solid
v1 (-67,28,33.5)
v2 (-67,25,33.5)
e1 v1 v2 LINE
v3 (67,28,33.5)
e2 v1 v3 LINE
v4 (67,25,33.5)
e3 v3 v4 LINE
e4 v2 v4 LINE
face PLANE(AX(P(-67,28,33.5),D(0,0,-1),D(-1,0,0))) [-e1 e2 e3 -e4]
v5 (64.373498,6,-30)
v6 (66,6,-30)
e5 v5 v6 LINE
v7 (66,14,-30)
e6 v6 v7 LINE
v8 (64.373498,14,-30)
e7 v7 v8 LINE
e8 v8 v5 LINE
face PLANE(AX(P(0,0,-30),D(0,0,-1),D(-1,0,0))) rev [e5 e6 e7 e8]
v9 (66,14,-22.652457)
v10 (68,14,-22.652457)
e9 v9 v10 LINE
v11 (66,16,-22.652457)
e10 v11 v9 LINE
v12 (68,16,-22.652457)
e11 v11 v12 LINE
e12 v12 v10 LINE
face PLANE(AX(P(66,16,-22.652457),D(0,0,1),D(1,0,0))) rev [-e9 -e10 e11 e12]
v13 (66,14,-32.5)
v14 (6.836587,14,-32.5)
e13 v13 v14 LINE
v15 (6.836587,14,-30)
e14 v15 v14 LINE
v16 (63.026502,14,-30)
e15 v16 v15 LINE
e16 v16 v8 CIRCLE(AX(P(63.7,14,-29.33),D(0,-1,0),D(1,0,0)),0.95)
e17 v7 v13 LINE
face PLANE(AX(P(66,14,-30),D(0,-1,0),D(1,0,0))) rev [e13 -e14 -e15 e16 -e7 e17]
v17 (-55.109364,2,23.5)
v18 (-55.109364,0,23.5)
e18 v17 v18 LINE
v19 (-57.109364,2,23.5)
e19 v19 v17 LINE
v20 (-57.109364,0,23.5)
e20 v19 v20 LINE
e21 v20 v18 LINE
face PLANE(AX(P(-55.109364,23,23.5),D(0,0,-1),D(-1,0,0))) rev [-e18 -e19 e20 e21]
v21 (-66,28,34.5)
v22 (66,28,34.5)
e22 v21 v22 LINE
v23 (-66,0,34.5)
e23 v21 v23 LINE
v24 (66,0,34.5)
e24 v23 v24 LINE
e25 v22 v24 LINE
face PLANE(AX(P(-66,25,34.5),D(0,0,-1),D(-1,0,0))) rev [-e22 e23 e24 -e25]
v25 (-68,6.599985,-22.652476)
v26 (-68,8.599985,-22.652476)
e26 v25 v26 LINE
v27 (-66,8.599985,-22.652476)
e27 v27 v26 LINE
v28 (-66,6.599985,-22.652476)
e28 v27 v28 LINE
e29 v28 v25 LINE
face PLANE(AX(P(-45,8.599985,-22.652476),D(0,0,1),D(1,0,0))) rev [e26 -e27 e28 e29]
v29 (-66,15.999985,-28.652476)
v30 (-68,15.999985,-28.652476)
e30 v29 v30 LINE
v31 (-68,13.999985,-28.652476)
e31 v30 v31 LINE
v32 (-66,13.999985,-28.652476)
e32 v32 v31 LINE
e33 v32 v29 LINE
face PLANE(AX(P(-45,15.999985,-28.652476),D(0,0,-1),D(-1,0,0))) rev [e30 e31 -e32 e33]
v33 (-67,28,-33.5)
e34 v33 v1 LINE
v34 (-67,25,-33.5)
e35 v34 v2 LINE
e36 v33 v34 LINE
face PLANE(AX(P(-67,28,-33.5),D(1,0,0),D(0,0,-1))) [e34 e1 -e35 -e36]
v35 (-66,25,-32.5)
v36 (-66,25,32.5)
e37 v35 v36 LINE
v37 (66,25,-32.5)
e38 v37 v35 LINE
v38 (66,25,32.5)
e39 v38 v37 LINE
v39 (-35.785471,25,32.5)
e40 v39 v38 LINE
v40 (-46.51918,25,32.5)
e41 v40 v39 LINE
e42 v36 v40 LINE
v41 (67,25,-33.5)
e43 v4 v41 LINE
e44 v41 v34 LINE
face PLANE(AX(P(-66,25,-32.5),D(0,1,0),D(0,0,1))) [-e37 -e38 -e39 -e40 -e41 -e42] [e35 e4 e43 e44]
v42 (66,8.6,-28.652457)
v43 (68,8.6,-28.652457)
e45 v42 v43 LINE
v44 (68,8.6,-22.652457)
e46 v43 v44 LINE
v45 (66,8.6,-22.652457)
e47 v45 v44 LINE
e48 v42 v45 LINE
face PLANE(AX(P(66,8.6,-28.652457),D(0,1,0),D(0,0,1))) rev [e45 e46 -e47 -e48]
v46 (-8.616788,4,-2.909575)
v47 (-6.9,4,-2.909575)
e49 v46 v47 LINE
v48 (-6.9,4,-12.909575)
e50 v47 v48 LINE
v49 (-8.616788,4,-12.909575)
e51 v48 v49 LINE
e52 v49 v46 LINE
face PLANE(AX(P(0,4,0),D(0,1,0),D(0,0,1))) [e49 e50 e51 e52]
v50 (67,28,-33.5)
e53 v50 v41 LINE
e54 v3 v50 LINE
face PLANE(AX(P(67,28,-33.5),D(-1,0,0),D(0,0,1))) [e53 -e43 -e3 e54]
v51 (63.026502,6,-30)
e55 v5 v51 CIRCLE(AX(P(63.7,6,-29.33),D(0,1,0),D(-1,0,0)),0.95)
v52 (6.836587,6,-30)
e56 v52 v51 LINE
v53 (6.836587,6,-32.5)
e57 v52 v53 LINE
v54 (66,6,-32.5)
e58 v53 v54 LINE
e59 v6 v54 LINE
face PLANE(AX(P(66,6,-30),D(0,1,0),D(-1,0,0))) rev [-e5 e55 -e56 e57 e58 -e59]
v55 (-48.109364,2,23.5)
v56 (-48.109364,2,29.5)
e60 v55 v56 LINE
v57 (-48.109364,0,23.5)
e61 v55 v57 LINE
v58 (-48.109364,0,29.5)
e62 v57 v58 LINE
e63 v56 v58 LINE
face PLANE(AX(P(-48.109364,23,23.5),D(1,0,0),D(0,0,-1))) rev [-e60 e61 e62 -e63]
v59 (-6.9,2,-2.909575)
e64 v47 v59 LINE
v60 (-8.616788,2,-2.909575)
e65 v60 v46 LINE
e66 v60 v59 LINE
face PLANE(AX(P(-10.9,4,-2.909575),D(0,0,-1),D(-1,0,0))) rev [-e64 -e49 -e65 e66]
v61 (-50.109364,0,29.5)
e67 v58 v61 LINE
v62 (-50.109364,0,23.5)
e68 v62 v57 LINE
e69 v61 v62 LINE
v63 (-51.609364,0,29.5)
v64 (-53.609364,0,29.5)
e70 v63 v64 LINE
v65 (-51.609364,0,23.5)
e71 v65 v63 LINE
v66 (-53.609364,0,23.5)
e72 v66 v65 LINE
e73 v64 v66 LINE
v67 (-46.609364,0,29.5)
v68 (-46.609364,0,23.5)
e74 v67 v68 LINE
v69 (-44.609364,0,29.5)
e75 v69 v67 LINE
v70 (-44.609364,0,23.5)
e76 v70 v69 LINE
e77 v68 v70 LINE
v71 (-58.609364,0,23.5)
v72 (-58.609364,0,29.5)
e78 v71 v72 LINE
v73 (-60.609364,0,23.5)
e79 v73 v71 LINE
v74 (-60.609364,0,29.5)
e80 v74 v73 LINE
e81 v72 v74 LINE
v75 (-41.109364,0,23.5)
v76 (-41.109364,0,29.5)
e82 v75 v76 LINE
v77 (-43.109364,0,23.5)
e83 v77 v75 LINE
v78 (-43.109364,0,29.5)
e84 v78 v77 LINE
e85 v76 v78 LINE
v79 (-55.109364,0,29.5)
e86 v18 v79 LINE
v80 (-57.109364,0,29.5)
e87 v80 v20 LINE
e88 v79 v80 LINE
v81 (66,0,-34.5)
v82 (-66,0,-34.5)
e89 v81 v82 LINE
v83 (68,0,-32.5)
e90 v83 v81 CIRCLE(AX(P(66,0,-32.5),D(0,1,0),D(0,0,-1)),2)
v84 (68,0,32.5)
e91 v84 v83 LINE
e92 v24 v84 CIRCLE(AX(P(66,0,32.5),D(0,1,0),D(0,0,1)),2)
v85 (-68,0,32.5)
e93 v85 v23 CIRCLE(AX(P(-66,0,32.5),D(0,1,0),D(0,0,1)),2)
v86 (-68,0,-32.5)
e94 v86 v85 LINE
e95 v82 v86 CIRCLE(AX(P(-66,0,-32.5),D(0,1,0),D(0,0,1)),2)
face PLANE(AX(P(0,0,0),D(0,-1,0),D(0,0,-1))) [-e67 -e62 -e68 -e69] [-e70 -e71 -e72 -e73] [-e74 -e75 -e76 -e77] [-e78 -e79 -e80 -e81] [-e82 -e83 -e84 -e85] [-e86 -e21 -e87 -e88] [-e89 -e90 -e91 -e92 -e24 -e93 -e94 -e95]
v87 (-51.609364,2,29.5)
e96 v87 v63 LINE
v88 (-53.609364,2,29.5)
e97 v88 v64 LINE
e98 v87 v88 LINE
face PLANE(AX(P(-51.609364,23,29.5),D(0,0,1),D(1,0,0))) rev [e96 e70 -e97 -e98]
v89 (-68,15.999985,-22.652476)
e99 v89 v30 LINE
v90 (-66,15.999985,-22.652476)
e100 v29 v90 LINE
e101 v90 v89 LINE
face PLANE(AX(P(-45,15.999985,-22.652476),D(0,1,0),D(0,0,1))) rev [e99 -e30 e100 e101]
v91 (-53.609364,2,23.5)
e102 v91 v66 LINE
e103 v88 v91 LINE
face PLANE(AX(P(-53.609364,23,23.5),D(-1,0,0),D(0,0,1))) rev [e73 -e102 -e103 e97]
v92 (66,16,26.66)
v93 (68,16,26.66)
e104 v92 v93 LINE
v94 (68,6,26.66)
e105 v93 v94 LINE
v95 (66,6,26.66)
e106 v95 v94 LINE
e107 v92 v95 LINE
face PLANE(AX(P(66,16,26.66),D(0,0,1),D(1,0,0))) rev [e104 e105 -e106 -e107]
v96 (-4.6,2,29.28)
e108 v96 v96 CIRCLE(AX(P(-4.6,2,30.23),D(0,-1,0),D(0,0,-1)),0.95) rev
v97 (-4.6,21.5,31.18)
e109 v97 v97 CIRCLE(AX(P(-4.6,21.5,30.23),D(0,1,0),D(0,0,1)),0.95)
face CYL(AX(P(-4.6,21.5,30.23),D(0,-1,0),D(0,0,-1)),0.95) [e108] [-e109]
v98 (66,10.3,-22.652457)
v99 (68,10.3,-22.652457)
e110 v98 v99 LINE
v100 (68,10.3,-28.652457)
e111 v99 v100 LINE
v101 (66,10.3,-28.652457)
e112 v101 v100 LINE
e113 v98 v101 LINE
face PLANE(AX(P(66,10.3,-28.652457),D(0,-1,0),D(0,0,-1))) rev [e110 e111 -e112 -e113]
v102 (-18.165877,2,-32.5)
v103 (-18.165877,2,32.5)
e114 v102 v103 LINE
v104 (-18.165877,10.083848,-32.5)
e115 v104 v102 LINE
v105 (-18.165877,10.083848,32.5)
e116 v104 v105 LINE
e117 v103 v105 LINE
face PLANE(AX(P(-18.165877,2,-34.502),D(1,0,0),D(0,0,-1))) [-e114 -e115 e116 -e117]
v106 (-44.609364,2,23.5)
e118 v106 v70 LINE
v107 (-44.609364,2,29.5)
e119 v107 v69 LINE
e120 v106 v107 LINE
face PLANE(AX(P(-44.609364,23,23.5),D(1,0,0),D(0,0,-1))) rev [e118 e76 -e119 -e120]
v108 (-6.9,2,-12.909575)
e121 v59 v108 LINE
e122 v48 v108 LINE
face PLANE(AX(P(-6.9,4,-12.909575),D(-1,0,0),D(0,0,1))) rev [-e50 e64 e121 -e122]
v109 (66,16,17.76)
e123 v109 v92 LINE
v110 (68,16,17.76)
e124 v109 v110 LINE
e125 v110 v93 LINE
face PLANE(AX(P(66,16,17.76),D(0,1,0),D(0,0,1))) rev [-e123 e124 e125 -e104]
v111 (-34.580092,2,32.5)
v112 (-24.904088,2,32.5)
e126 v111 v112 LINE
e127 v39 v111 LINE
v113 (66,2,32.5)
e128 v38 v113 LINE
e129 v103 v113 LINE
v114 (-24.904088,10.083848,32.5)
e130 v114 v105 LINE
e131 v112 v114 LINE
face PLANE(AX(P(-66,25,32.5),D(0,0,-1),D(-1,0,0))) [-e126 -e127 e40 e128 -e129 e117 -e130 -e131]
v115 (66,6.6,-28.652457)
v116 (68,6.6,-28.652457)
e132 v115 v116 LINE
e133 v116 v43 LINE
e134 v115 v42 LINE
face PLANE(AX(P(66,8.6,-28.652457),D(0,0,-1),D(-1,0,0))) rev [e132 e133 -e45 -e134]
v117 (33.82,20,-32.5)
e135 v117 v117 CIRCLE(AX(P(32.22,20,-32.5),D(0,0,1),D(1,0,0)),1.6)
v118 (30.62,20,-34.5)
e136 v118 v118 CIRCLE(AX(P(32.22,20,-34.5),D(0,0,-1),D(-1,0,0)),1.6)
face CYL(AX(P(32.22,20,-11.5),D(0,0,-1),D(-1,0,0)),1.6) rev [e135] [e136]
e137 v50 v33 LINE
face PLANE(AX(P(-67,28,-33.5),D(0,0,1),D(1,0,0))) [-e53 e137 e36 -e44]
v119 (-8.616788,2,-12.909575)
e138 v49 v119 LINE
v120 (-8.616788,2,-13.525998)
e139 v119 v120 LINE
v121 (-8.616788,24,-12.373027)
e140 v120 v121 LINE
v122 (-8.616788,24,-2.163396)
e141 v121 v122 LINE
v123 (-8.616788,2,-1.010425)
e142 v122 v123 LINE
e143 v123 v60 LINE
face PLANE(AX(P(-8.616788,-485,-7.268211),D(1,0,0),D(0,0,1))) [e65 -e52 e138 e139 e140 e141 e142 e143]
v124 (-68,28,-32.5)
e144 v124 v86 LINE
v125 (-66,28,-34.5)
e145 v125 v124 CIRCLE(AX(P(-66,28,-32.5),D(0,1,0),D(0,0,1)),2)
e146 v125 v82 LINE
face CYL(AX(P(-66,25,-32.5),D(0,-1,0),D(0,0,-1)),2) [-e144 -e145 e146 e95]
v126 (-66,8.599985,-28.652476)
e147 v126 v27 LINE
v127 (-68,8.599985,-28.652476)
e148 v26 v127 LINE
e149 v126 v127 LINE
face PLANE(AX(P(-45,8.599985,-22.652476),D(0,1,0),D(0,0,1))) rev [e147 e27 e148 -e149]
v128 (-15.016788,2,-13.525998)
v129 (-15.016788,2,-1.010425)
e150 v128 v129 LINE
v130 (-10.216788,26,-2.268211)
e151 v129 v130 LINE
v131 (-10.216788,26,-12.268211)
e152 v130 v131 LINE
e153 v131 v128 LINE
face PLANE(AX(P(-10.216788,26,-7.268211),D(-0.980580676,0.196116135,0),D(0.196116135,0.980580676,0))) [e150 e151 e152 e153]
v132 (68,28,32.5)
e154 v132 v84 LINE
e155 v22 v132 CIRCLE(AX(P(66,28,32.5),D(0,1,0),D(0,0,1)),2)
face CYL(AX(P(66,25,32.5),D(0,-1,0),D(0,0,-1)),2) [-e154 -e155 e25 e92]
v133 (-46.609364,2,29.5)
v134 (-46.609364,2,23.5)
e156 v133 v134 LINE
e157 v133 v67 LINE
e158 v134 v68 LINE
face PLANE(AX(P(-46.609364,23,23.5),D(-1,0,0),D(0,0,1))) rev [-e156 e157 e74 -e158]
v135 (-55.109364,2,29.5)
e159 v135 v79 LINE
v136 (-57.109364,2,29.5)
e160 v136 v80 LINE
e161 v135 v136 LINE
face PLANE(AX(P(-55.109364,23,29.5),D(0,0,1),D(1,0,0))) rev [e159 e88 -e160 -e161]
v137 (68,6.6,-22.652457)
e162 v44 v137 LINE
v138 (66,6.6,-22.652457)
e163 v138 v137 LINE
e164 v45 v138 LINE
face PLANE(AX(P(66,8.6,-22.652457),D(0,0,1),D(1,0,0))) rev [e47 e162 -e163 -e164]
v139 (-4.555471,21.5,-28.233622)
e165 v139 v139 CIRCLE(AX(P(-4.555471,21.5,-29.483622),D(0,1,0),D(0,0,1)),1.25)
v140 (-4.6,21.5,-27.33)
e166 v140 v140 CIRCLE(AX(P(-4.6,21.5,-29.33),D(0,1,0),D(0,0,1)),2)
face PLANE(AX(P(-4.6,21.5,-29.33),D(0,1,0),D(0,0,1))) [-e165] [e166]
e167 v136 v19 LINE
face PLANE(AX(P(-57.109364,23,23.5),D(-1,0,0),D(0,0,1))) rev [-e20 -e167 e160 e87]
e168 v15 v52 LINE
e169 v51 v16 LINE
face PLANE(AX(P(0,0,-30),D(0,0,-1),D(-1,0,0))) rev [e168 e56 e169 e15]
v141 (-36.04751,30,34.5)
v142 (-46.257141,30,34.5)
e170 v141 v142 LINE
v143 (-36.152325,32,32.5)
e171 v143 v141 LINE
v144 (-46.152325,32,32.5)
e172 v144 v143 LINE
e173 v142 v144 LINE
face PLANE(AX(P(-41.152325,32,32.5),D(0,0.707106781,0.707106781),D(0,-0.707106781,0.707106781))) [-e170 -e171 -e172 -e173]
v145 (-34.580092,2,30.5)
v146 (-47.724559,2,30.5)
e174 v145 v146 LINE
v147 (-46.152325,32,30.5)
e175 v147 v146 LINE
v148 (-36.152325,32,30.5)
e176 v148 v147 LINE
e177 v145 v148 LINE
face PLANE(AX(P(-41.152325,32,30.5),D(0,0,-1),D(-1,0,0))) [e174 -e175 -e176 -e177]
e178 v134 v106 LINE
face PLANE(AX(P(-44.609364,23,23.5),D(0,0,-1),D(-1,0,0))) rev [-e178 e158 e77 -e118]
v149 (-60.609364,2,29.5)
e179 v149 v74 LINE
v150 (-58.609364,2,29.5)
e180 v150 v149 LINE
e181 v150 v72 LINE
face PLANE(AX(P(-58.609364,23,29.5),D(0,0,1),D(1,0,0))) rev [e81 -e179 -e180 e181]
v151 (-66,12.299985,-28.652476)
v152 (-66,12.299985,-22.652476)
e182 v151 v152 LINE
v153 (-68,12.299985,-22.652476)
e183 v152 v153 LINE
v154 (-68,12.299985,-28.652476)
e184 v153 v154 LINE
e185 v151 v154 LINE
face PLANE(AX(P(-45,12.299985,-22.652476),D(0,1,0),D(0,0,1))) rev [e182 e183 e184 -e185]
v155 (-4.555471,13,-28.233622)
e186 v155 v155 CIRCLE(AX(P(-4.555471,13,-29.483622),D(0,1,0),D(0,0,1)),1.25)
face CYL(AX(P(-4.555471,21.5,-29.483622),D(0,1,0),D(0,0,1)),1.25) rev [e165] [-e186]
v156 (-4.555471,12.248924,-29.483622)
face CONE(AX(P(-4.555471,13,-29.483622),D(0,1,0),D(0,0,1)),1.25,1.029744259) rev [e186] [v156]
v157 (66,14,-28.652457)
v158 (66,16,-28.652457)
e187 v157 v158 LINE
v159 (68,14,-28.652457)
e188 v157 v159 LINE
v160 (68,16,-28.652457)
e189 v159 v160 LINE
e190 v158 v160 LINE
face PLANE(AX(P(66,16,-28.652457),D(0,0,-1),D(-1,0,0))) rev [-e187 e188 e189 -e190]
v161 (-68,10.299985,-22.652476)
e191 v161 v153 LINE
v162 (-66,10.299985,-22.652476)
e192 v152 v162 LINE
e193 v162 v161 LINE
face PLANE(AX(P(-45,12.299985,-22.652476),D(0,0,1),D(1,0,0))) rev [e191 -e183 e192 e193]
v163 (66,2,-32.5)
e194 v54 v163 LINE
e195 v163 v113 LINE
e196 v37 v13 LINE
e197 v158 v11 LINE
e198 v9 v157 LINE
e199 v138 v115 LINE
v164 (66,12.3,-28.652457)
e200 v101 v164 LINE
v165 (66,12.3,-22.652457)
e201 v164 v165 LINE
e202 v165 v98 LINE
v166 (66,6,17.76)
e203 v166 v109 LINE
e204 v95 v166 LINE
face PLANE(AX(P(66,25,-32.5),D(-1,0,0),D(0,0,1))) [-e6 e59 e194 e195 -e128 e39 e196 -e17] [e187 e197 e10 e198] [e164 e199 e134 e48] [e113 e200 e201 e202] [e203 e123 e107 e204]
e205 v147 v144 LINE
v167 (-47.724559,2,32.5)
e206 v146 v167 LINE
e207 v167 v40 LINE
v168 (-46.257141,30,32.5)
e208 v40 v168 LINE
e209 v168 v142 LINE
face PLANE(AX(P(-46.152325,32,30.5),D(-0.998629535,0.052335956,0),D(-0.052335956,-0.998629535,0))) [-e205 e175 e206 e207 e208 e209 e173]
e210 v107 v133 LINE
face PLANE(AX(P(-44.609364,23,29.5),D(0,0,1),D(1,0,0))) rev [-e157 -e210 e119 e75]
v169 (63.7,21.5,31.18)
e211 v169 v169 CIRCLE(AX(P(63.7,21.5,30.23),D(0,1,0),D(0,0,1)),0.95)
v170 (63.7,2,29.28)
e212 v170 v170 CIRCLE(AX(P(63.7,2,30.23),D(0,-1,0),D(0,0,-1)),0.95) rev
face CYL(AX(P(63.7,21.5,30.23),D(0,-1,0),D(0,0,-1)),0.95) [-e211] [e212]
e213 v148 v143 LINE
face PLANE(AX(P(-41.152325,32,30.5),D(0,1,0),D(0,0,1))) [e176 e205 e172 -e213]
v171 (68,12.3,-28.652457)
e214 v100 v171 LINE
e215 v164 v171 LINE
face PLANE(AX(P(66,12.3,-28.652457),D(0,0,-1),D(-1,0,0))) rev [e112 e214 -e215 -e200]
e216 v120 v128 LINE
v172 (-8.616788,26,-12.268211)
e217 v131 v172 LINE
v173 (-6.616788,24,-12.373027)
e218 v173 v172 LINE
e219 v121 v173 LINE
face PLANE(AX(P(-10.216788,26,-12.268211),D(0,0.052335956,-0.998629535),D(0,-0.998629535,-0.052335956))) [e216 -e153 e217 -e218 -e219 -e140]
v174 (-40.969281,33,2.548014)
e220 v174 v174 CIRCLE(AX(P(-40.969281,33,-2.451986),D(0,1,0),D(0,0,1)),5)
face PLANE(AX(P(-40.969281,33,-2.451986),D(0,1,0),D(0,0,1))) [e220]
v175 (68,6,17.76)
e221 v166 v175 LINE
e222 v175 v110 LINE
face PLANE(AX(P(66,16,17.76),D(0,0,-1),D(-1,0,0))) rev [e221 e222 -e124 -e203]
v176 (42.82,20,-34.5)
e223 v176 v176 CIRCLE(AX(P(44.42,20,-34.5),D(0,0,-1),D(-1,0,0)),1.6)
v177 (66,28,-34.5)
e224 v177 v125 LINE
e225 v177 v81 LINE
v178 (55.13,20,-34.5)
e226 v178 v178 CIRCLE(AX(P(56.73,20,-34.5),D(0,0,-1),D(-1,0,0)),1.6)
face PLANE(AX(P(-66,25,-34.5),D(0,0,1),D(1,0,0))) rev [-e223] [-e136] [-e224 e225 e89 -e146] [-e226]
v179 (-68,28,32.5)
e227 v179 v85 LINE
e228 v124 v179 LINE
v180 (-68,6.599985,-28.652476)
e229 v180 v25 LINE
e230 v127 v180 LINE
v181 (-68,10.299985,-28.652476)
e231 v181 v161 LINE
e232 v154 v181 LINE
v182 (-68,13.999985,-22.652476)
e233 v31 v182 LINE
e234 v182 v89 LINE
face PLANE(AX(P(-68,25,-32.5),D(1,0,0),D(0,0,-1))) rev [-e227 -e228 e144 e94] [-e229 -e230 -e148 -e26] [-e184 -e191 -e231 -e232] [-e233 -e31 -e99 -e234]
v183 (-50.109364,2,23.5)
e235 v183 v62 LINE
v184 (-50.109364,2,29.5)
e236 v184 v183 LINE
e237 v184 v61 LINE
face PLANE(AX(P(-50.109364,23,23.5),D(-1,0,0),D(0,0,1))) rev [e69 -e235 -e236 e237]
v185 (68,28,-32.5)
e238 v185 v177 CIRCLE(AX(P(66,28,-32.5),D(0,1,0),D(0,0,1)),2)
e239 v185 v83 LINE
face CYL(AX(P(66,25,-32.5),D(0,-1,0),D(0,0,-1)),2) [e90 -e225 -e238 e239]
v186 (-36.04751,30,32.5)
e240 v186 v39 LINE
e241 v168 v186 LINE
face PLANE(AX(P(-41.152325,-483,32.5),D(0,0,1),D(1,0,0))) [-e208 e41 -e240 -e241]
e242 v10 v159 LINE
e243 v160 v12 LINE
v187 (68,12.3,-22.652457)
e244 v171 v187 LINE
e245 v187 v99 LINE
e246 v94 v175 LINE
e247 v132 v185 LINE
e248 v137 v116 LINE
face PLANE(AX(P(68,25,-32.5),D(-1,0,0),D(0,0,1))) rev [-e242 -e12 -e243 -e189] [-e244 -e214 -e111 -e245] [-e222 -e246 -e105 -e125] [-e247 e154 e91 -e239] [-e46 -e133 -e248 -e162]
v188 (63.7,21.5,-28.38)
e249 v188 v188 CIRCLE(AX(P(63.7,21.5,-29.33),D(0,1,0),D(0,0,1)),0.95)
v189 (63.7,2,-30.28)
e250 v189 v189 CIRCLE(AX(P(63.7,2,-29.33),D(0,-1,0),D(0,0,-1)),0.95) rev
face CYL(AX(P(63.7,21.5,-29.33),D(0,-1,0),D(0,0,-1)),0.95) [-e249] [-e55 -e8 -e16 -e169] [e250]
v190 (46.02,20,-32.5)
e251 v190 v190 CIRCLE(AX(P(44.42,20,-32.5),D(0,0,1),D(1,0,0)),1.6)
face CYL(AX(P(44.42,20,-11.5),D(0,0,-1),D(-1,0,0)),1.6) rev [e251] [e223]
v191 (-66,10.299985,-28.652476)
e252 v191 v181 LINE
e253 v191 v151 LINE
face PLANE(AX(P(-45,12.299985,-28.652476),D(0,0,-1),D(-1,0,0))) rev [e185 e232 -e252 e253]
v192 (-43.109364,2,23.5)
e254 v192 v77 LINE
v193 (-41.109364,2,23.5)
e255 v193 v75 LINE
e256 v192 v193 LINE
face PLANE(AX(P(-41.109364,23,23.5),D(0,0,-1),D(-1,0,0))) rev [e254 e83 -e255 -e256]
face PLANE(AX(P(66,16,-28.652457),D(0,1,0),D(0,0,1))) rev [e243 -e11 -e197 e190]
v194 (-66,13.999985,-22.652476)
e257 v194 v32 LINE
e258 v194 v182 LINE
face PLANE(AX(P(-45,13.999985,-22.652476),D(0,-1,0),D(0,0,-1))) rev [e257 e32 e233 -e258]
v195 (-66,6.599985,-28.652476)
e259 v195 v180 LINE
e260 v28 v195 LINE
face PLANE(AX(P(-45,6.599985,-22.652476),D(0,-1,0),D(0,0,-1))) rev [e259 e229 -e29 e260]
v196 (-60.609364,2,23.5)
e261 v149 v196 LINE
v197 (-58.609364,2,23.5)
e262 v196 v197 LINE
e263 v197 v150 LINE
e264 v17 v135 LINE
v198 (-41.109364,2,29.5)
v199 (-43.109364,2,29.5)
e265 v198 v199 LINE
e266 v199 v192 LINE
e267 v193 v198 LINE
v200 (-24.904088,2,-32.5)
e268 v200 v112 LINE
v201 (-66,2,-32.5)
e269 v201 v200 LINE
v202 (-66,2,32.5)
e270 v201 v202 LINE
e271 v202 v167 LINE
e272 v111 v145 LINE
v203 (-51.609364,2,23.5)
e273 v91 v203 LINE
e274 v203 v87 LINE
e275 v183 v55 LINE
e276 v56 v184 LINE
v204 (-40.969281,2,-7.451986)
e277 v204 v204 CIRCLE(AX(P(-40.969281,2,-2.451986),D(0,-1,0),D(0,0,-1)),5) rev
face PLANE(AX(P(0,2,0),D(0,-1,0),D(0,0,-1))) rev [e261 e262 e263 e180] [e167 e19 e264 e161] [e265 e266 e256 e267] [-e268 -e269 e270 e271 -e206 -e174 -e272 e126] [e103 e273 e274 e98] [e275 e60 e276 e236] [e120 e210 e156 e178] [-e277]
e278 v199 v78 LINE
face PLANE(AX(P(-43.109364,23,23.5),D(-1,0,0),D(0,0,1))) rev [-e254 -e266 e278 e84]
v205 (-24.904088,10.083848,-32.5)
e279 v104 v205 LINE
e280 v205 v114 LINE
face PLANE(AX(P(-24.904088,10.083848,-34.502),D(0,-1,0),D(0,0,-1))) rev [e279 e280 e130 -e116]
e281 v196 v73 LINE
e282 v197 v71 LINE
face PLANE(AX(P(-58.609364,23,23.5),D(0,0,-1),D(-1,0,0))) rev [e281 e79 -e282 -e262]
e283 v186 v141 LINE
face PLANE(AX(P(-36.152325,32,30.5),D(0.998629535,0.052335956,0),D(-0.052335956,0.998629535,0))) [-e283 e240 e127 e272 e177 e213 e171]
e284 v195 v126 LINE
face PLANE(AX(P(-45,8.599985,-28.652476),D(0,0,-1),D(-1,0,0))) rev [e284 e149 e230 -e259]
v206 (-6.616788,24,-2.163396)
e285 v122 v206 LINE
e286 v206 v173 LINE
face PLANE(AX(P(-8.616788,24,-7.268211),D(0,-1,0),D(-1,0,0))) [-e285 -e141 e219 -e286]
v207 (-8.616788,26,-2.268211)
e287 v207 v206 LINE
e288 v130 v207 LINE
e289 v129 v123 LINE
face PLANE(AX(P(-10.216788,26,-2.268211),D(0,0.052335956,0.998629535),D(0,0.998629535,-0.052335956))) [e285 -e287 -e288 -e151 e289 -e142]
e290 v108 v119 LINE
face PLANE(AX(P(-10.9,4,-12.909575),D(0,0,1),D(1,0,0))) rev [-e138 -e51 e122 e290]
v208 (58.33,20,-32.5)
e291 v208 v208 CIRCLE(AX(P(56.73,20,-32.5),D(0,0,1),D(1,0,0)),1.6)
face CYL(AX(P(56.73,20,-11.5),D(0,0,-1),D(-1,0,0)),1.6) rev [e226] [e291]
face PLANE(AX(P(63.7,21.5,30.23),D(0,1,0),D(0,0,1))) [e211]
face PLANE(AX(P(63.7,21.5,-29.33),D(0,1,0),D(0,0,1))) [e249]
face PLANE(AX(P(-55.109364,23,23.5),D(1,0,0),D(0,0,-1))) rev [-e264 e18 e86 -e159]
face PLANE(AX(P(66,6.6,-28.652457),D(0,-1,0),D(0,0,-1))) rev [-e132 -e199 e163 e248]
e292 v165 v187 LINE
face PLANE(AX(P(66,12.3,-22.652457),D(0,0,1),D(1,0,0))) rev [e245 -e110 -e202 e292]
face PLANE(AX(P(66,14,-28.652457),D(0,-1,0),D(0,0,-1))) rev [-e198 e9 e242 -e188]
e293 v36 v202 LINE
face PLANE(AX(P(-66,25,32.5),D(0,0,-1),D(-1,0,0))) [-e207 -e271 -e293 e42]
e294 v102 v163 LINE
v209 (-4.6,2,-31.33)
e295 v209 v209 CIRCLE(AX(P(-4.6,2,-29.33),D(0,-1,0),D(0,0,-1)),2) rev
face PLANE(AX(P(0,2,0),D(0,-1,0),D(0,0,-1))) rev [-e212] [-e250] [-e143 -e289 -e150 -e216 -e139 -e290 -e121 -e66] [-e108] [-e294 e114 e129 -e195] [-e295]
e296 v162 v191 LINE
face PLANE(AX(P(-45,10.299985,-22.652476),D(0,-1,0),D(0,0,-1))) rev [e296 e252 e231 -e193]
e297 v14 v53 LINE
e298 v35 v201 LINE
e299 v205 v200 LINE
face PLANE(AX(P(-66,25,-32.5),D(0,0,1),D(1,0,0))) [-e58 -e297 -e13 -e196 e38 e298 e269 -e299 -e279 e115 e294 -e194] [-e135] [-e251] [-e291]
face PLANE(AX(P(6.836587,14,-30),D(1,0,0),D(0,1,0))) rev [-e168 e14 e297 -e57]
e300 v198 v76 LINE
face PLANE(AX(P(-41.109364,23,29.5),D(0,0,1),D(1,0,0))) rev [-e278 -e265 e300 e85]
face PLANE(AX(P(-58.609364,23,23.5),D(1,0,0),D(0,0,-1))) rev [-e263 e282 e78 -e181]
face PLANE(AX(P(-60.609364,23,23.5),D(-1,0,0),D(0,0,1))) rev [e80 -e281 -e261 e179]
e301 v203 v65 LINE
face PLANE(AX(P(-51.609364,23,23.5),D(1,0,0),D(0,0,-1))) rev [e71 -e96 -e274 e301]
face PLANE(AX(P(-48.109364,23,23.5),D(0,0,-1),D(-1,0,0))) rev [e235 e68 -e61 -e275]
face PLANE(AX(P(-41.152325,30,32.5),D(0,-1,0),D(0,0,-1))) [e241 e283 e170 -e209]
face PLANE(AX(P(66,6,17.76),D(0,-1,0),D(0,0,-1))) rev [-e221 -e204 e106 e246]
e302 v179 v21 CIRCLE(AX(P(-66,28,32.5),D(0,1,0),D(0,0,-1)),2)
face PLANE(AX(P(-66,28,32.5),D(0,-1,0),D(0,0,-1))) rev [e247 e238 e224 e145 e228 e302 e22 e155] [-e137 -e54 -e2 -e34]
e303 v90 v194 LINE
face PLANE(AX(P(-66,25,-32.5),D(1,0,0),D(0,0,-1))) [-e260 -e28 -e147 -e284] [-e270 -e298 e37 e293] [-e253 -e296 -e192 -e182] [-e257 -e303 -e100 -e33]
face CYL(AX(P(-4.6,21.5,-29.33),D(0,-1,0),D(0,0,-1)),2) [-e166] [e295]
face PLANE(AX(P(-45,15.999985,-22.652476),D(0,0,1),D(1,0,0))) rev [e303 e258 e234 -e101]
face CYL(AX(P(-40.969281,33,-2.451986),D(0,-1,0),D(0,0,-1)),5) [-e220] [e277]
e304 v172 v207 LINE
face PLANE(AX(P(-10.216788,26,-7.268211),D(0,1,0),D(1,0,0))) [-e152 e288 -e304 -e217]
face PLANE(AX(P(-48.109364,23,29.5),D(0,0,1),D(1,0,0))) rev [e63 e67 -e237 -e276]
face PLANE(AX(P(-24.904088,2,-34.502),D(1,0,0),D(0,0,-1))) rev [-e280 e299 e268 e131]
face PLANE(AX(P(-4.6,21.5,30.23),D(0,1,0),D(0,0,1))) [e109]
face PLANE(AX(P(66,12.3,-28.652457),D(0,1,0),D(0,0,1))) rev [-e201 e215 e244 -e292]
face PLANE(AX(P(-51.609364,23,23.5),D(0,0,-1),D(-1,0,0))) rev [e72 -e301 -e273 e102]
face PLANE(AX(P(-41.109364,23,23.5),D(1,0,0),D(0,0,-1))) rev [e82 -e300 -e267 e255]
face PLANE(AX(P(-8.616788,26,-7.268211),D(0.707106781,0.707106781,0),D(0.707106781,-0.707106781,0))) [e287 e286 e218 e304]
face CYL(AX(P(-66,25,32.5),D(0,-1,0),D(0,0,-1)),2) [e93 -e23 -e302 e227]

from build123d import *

# Parameters (mm, degrees)
SKETCH_2_W                  = 132
SKETCH_2_H                  = 65
EXTRUDE_2_DEPTH             = 2
SKETCH_2_3_W                = 132
SKETCH_2_3_H                = 65
EXTRUDE_3_DEPTH             = 25
SKETCH_4_R                  = 0.95
SKETCH_4_R_2                = 2
EXTRUDE_4_DEPTH             = 19.5
SKETCH_9_W                  = 6
SKETCH_9_H                  = 2
CUT_EXTRUDE_1_DEPTH         = 23
SKETCH_5_W                  = 8.9
SKETCH_5_H                  = 10
SKETCH_5_W_2                = 6
SKETCH_5_H_2                = 2
CUT_EXTRUDE_2_DEPTH         = 2
SKETCH_11_W                 = 2
SKETCH_11_H                 = 6
CUT_EXTRUDE_3_DEPTH         = 23
SKETCH_12_R                 = 1.6
CUT_EXTRUDE_4_DEPTH         = 23
HOLE_WIZARD_M3_3_D          = 2.5
HOLE_WIZARD_M3_3_DEPTH      = 8.5
HOLE_WIZARD_M3_3_TIP        = 0.751075774
SKETCH_24_W                 = 134
SKETCH_24_H                 = 67
EXTRUDE_5_DEPTH             = 3
SKETCH_25_R                 = 5
EXTRUDE_6_DEPTH             = 31
MACRO_START                 = 30.5
MACRO_FEATURE_1_DEPTH       = 4
MACRO_FEATURE_1_2_DEPTH     = 2
MACRO_START_2               = 45.608387387
MACRO_FEATURE_1_3_OUTLINE_W = 13
MACRO_FEATURE_1_3_OUTLINE_H = 6
MACRO_FEATURE_1_3_DEPTH     = 2.391612613
SKETCH_28_W                 = 4
SKETCH_28_H                 = 10
EXTRUDE_7_DEPTH             = 2
MACRO_START_3               = -10.52248
MACRO_FEATURE_2_DEPTH       = 1.905691985
MACRO_START_4               = -10.216788015
MACRO_FEATURE_2_2_DEPTH     = 1.6
MACRO_START_5               = -13.52599806
MACRO_FEATURE_2_3_DEPTH     = 12.515573406
MACRO_START_6               = -12.373026916
MACRO_FEATURE_2_4_DEPTH     = 10.209631117
MACRO_START_7               = -16
MACRO_FEATURE_2_5_DEPTH     = 10
SKETCH_32_W                 = 59.163412992
SKETCH_32_H                 = 8
EXTRUDE_9_DEPTH             = 2.5
EXTRUDE_10_REACH            = 103.005
SKETCH_31_W                 = 6.738210925
SKETCH_31_H                 = 8.083848138


with BuildPart() as part:
    # 草图2 → 凸台-拉伸2 (new body)
    with BuildSketch(Plane(origin=(0, 0, 0), x_dir=(1, 0, 0), z_dir=(0, 1, 0))):
        Rectangle(SKETCH_2_W, SKETCH_2_H)
    extrude(amount=EXTRUDE_2_DEPTH)

    # 草图2<3> → 凸台-拉伸3 (add)
    with BuildSketch(Plane(origin=(0, 0, 0), x_dir=(1, 0, 0), z_dir=(0, 1, 0))):
        with BuildLine():
            Line((-66, 34.5), (66, 34.5))
            ThreePointArc((66, 34.5), (67.414213562, 33.914213562), (68, 32.5))
            Line((68, 32.5), (68, -32.5))
            ThreePointArc((68, -32.5), (67.414213562, -33.914213562), (66, -34.5))
            Line((66, -34.5), (-66, -34.5))
            ThreePointArc((-66, -34.5), (-67.414213562, -33.914213562), (-68, -32.5))
            Line((-68, -32.5), (-68, 32.5))
            ThreePointArc((-68, 32.5), (-67.414213562, 33.914213562), (-66, 34.5))
        make_face()
        Rectangle(SKETCH_2_3_W, SKETCH_2_3_H, mode=Mode.SUBTRACT)
    extrude(amount=EXTRUDE_3_DEPTH)

    # 草图4 → 凸台-拉伸4 (add)
    with BuildSketch(Plane(origin=(0, 2, 0), x_dir=(1, 0, 0), z_dir=(0, 1, 0))):
        with Locations(Location((63.7, 29.33, 0), (0, 0, 90))):
            Circle(SKETCH_4_R)
        with Locations(Location((63.7, -30.23, 0), (0, 0, 90))):
            Circle(SKETCH_4_R)
        with Locations(Location((-4.6, 29.33, 0), (0, 0, 90))):
            Circle(SKETCH_4_R_2)
        with Locations(Location((-4.6, -30.23, 0), (0, 0, 90))):
            Circle(SKETCH_4_R)
    extrude(amount=EXTRUDE_4_DEPTH)

    # 草图9 → 切除-拉伸1 (cut)
    with BuildSketch(Plane.ZY.offset(68)):
        with Locations((-25.652476361, 14.999984766)):
            Rectangle(SKETCH_9_W, SKETCH_9_H)
        with Locations((-25.652476361, 11.299984766)):
            Rectangle(SKETCH_9_W, SKETCH_9_H)
        with Locations((-25.652476361, 7.599984766)):
            Rectangle(SKETCH_9_W, SKETCH_9_H)
    extrude(amount=-CUT_EXTRUDE_1_DEPTH, mode=Mode.SUBTRACT)

    # 草图5 → 切除-拉伸2 (cut)
    with BuildSketch(Plane(origin=(68, 0, 0), x_dir=(0, 0, -1), z_dir=(1, 0, 0))):
        with Locations((-22.21, 11)):
            Rectangle(SKETCH_5_W, SKETCH_5_H)
        with Locations((25.652457488, 15)):
            Rectangle(SKETCH_5_W_2, SKETCH_5_H_2)
        with Locations((25.652457488, 11.3)):
            Rectangle(SKETCH_5_W_2, SKETCH_5_H_2)
        with Locations((25.652457488, 7.6)):
            Rectangle(SKETCH_5_W_2, SKETCH_5_H_2)
    extrude(amount=-CUT_EXTRUDE_2_DEPTH, mode=Mode.SUBTRACT)

    # 草图11 → 切除-拉伸3 (cut)
    with BuildSketch(Plane.XZ):
        with Locations((-42.109364057, 26.5)):
            Rectangle(SKETCH_11_W, SKETCH_11_H)
        with Locations((-45.609364057, 26.5)):
            Rectangle(SKETCH_11_W, SKETCH_11_H)
        with Locations((-49.109364057, 26.5)):
            Rectangle(SKETCH_11_W, SKETCH_11_H)
        with Locations((-52.609364057, 26.5)):
            Rectangle(SKETCH_11_W, SKETCH_11_H)
        with Locations((-56.109364057, 26.5)):
            Rectangle(SKETCH_11_W, SKETCH_11_H)
        with Locations((-59.609364057, 26.5)):
            Rectangle(SKETCH_11_W, SKETCH_11_H)
    extrude(amount=-CUT_EXTRUDE_3_DEPTH, mode=Mode.SUBTRACT)

    # 草图12 → 切除-拉伸4 (cut)
    with BuildSketch(Plane(origin=(0, 0, -34.5), x_dir=(-1, 0, 0), z_dir=(0, 0, -1))):
        with Locations((-56.73, 20)):
            Circle(SKETCH_12_R)
        with Locations((-44.42, 20)):
            Circle(SKETCH_12_R)
        with Locations((-32.22, 20)):
            Circle(SKETCH_12_R)
    extrude(amount=-CUT_EXTRUDE_4_DEPTH, mode=Mode.SUBTRACT)

    # M3 螺纹孔3
    with Locations(Plane(origin=(0, 21.5, 0), x_dir=(1, 0, 0), z_dir=(0, 1, 0))):
        with Locations((-4.555471055, 29.483622127)):
            Hole(HOLE_WIZARD_M3_3_D / 2, depth=HOLE_WIZARD_M3_3_DEPTH)
            with Locations((0, 0, -(HOLE_WIZARD_M3_3_DEPTH + HOLE_WIZARD_M3_3_TIP / 2))):  # 118° drill point
                Cone(0, HOLE_WIZARD_M3_3_D / 2, HOLE_WIZARD_M3_3_TIP, mode=Mode.SUBTRACT)

    # 草图24 → 凸台-拉伸5 (add)
    with BuildSketch(Plane(origin=(0, 25, 0), x_dir=(1, 0, 0), z_dir=(0, 1, 0))):
        with BuildLine():
            Line((66, -34.5), (-66, -34.5))
            ThreePointArc((-66, -34.5), (-67.414213562, -33.914213562), (-68, -32.5))
            Line((-68, -32.5), (-68, 32.5))
            ThreePointArc((-68, 32.5), (-67.414213562, 33.914213562), (-66, 34.5))
            Line((-66, 34.5), (66, 34.5))
            ThreePointArc((66, 34.5), (67.414213562, 33.914213562), (68, 32.5))
            Line((68, 32.5), (68, -32.5))
            ThreePointArc((68, -32.5), (67.414213562, -33.914213562), (66, -34.5))
        make_face()
        Rectangle(SKETCH_24_W, SKETCH_24_H, mode=Mode.SUBTRACT)
    extrude(amount=EXTRUDE_5_DEPTH)

    # 草图25 → 凸台-拉伸6 (add)
    with BuildSketch(Plane(origin=(0, 2, 0), x_dir=(1, 0, 0), z_dir=(0, 1, 0))):
        with Locations(Location((-40.969280892, 2.451986174, 0), (0, 0, 90))):
            Circle(SKETCH_25_R)
    extrude(amount=EXTRUDE_6_DEPTH)



with BuildPart() as body_2:
    # Macro Feature 1: read off the stored shape, not the designer's step
    # Macro Feature 1 outline → Macro Feature 1 (new body)
    with BuildSketch(Plane.XY.offset(MACRO_START)):
        Polygon((-36.152325447, 32), (-46.152325447, 32), (-46.257141006, 30), (-36.047509888, 30), align=None)
    extrude(amount=MACRO_FEATURE_1_DEPTH)


with BuildPart() as part_1:
    add(part.part)

    add(body_2.part)  # Macro Feature 1 2 merges body 2
    # Macro Feature 1 2 outline → Macro Feature 1 2 (add)
    with BuildSketch(Plane.XY.offset(MACRO_START)):
        Polygon((-36.047509888, 30), (-46.257141006, 30), (-47.724558825, 2), (-34.580092068, 2), align=None)
    extrude(amount=MACRO_FEATURE_1_2_DEPTH)

    # Macro Feature 1 3 outline → Macro Feature 1 3 (cut)
    with BuildSketch(Plane(origin=(0, 0, 0), x_dir=(1, 0, 0), z_dir=(0, 0.707106781186547, 0.707106781186548)).offset(MACRO_START_2)):
        with Locations((-41.5, -2)):
            Rectangle(MACRO_FEATURE_1_3_OUTLINE_W, MACRO_FEATURE_1_3_OUTLINE_H)
    extrude(amount=MACRO_FEATURE_1_3_DEPTH, mode=Mode.SUBTRACT)

    # 草图28 → 凸台-拉伸7 (add)
    with BuildSketch(Plane(origin=(0, 2, 0), x_dir=(1, 0, 0), z_dir=(0, 1, 0))):
        with Locations((-8.9, 7.909574936)):
            Rectangle(SKETCH_28_W, SKETCH_28_H)
    extrude(amount=EXTRUDE_7_DEPTH)

    # Macro Feature 2: read off the stored shape, not the designer's step
    # Macro Feature 2 outline → Macro Feature 2 (add)
    with BuildSketch(Plane.YZ.offset(MACRO_START_3)):
        Polygon((2, -12.909574936), (2, -13.52599806), (24, -12.373026916), (24, -2.163395799), (2, -1.010424654), (2, -2.909574936), (4, -2.909574936), (4, -12.909574936), align=None)
    extrude(amount=MACRO_FEATURE_2_DEPTH)

    # Macro Feature 2 2 outline → Macro Feature 2 2 (add)
    with BuildSketch(Plane.YZ.offset(MACRO_START_4)):
        Polygon((24, -2.163395799), (24, -12.373026916), (26, -12.268211357), (26, -2.268211357), align=None)
    extrude(amount=MACRO_FEATURE_2_2_DEPTH)

    # Macro Feature 2 3 outline → Macro Feature 2 3 (add)
    with BuildSketch(Plane.XY.offset(MACRO_START_5)):
        Polygon((-10.216788015, 24), (-10.216788015, 26), (-15.016788015, 2), (-10.52248, 2), (-10.52248, 24), align=None)
    extrude(amount=MACRO_FEATURE_2_3_DEPTH)

    # Macro Feature 2 4 outline → Macro Feature 2 4 (add)
    with BuildSketch(Plane.XY.offset(MACRO_START_6)):
        Polygon((-8.616788015, 26), (-8.616788015, 24), (-6.616788015, 24), align=None)
    extrude(amount=MACRO_FEATURE_2_4_DEPTH)

    # Macro Feature 2 5 outline → Macro Feature 2 5 (cut)
    with BuildSketch(Plane.YZ.offset(MACRO_START_7)):
        Polygon((2, -13.52599806), (27, -13.52599806), (27, -12.215803578), (26, -12.268211357), align=None)
        Polygon((26, -2.268211357), (27, -2.320619136), (27, -1.010424654), (2, -1.010424654), align=None)
    extrude(amount=MACRO_FEATURE_2_5_DEPTH, mode=Mode.SUBTRACT)

    # 草图32 → 凸台-拉伸9 (add)
    with BuildSketch(Plane.XY.offset(-32.5)):
        with Locations((36.418293504, 10)):
            Rectangle(SKETCH_32_W, SKETCH_32_H)
    extrude(amount=EXTRUDE_9_DEPTH)

    # 草图31 → 凸台-拉伸10 (add, up to next)
    with BuildSketch(Plane(origin=(0, 0, 32.5), x_dir=(-1, 0, 0), z_dir=(0, 0, -1)), mode=Mode.PRIVATE) as extrude_10_sk1:
        with Locations((21.534982766, 6.041924069)):
            Rectangle(SKETCH_31_W, SKETCH_31_H)
    extrude_10_tool1 = extrude(extrude_10_sk1.sketch, amount=EXTRUDE_10_REACH, mode=Mode.PRIVATE) - part_1.part
    add(extrude_10_tool1.solids().sort_by_distance((-21.534983, 6.041924, 32.5))[0])


solid = part_1.part
